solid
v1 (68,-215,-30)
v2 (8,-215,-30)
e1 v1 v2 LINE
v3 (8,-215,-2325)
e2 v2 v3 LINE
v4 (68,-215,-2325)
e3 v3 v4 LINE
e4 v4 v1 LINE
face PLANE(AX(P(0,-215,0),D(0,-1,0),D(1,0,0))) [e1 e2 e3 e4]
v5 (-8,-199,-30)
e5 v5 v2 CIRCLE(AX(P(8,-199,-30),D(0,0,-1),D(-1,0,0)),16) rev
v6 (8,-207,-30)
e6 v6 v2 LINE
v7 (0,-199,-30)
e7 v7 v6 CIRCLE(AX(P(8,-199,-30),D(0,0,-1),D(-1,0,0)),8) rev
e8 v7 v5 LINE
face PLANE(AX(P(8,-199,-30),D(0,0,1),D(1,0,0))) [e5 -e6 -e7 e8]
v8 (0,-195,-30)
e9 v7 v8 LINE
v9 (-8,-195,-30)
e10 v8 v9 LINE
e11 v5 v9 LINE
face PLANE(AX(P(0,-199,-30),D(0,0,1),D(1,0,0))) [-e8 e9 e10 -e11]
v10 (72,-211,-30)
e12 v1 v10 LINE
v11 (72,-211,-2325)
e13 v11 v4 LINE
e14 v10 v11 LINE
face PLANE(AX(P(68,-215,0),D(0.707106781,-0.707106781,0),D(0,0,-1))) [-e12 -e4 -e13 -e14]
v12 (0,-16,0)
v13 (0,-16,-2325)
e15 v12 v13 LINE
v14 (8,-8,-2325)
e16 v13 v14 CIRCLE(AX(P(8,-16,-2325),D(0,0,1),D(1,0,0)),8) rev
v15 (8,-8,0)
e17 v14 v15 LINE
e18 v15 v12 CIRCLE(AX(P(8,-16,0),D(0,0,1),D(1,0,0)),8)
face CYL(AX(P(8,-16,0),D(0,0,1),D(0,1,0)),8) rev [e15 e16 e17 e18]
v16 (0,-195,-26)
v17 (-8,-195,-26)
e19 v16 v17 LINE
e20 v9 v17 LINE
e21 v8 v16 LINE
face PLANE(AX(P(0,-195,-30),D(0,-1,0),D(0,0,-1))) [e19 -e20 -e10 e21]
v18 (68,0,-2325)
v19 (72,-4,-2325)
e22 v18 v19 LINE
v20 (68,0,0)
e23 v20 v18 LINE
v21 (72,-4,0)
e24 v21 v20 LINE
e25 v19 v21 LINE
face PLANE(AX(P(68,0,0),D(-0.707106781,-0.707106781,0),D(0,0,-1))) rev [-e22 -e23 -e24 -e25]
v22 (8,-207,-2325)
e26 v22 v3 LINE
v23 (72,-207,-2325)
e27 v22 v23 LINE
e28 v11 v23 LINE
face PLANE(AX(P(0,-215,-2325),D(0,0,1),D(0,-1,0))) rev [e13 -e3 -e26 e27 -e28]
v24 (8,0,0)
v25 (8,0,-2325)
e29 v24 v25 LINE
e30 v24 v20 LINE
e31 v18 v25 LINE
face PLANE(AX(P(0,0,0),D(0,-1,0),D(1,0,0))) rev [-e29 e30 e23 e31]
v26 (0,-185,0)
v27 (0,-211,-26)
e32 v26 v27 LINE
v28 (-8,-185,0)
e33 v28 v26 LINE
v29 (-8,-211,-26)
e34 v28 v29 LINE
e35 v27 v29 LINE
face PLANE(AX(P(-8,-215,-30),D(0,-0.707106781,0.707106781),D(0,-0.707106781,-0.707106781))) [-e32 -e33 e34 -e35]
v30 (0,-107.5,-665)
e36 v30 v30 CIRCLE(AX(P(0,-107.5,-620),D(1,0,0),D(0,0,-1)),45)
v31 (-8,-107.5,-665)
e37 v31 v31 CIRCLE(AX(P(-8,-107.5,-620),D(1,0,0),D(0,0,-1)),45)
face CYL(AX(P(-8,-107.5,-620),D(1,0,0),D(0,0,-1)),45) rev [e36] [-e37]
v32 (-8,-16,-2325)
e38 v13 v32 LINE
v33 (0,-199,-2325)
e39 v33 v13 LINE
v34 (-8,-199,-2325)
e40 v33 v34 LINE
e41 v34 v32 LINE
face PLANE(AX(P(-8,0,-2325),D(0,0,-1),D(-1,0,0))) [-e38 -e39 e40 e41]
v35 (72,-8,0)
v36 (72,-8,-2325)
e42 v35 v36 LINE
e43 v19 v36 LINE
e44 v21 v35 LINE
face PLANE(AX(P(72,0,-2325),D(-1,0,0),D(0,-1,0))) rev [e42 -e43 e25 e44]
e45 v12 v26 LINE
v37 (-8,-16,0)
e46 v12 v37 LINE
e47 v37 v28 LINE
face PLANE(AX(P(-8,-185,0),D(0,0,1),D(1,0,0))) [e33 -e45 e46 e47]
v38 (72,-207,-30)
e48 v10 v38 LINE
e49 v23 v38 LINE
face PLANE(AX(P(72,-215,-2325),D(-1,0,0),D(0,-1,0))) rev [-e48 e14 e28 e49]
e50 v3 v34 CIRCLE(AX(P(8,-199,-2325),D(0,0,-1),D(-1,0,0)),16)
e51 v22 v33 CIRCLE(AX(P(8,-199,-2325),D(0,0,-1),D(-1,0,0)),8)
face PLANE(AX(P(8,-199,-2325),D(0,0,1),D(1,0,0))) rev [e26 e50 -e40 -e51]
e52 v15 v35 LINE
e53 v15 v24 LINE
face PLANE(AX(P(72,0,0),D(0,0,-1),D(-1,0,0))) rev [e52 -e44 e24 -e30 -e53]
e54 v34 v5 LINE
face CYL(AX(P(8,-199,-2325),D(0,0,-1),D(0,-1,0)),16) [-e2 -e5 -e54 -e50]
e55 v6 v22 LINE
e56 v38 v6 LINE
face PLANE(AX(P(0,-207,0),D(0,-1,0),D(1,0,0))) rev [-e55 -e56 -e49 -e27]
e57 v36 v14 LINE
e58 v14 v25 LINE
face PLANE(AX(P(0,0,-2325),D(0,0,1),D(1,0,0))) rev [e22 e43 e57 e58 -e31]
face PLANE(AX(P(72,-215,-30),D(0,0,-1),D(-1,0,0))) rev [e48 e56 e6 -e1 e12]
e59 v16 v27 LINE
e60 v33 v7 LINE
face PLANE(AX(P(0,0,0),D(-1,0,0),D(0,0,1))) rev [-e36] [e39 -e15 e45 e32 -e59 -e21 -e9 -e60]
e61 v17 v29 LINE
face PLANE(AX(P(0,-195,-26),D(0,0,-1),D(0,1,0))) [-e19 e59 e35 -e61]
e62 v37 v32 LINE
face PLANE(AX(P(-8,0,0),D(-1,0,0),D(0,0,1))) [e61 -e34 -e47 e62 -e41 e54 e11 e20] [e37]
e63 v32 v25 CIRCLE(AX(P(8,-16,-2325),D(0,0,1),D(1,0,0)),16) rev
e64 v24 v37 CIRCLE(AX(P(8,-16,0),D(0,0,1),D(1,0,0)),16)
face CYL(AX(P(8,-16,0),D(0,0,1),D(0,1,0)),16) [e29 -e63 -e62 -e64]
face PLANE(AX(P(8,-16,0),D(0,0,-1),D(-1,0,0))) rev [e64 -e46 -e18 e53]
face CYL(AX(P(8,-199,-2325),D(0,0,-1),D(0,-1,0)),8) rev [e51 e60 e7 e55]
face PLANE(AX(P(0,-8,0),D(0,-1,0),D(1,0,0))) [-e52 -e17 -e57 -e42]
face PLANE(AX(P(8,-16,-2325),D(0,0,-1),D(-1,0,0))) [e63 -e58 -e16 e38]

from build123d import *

# Parameters (mm, degrees)
SM_BASE_FLANGE_1_DEPTH             = 8
SM_EDGE_FLANGE_1_STRIP_W           = 48
SM_EDGE_FLANGE_1_STRIP_H           = 8
SM_EDGE_FLANGE_1_STRIP_CUT_DEPTH   = 2325
SM_EDGE_FLANGE_1_STRIP_2_W         = 48
SM_EDGE_FLANGE_1_STRIP_2_H         = 8
SM_EDGE_FLANGE_1_STRIP_CUT_2_DEPTH = 2295
SM_EDGE_FLANGE_1_RELIEF_W          = 52
SM_EDGE_FLANGE_1_RELIEF_H          = 4
SM_EDGE_FLANGE_1_RELIEF_CUT_DEPTH  = 8
SM_EDGE_FLANGE_1_DEPTH             = 2325
SM_EDGE_FLANGE_1_BEND_DEPTH        = 2295
CHAMFER_1_SIZE                     = 4
SKETCH_12_R                        = 45
CUT_EXTRUDE_1_DEPTH                = 2337.029537484


# Sheet-metal steps are written as plain solids
with BuildPart() as part:
    # Sketch 1 → 基体-法兰1 (new body)
    with BuildSketch(Plane(origin=(0, 0, 0), x_dir=(0, 0, -1), z_dir=(1, 0, 0))):
        Polygon((0, 0), (2325, 0), (2325, -215), (30, -215), (0, -185), align=None)
    extrude(amount=-SM_BASE_FLANGE_1_DEPTH)

    # 边线-法兰1 strip (across the edge) → 边线-法兰1 strip cut (cut)
    with BuildSketch(Plane(origin=(0, 0, -2325), x_dir=(0, -1, 0), z_dir=(0, 0, 1))):
        with Locations((-8, -4)):
            Rectangle(SM_EDGE_FLANGE_1_STRIP_W, SM_EDGE_FLANGE_1_STRIP_H)
    extrude(amount=SM_EDGE_FLANGE_1_STRIP_CUT_DEPTH, mode=Mode.SUBTRACT)

    # 边线-法兰1 strip 2 (across the edge) → 边线-法兰1 strip cut 2 (cut)
    with BuildSketch(Plane(origin=(0, -215, -30), x_dir=(0, 1, 0), z_dir=(0, 0, -1))):
        with Locations((-8, -4)):
            Rectangle(SM_EDGE_FLANGE_1_STRIP_2_W, SM_EDGE_FLANGE_1_STRIP_2_H)
    extrude(amount=SM_EDGE_FLANGE_1_STRIP_CUT_2_DEPTH, mode=Mode.SUBTRACT)

    # 边线-法兰1 relief (on the sheet) → 边线-法兰1 relief cut (cut)
    with BuildSketch(Plane(origin=(0, -199, -30), x_dir=(0, 1, 0), z_dir=(1, 0, 0))):
        with Locations((-22, 2)):
            Rectangle(SM_EDGE_FLANGE_1_RELIEF_W, SM_EDGE_FLANGE_1_RELIEF_H)
    extrude(amount=-SM_EDGE_FLANGE_1_RELIEF_CUT_DEPTH, mode=Mode.SUBTRACT)

    # 边线-法兰1 section (across the edge) → 边线-法兰1 (add)
    with BuildSketch(Plane(origin=(0, 0, -2325), x_dir=(0, -1, 0), z_dir=(0, 0, 1))):
        with BuildLine():
            Line((0, 8), (0, 72))
            Line((0, 72), (8, 72))
            Line((8, 72), (8, 8))
            ThreePointArc((8, 8), (10.343145751, 2.343145751), (16, 0))
            Line((16, 0), (16, -8))
            ThreePointArc((16, -8), (4.686291501, -3.313708499), (0, 8))
        make_face()
    extrude(amount=SM_EDGE_FLANGE_1_DEPTH)

    # 边线-法兰1 section 2 (across the edge) → 边线-法兰1 bend (add)
    with BuildSketch(Plane(origin=(0, -215, -30), x_dir=(0, 1, 0), z_dir=(0, 0, -1))):
        with BuildLine():
            Line((0, 8), (0, 72))
            Line((0, 72), (8, 72))
            Line((8, 72), (8, 8))
            ThreePointArc((8, 8), (10.343145751, 2.343145751), (16, 0))
            Line((16, 0), (16, -8))
            ThreePointArc((16, -8), (4.686291501, -3.313708499), (0, 8))
        make_face()
    extrude(amount=SM_EDGE_FLANGE_1_BEND_DEPTH)

    # 倒角1
    chamfer_1_edges = [part.edges().sort_by_distance(p)[0] for p in [
        (72, 0, -1162.5),
        (72, -215, -1177.5),
    ]]
    chamfer(chamfer_1_edges, length=CHAMFER_1_SIZE)

    # 草图12 → 切除-拉伸1 (cut, through all)
    with BuildSketch(Plane(origin=(0, 0, 0), x_dir=(0, 0, -1), z_dir=(1, 0, 0))):
        with Locations((620, -107.5)):
            Circle(SKETCH_12_R)
    extrude(amount=-CUT_EXTRUDE_1_DEPTH, mode=Mode.SUBTRACT)


solid = part.part
